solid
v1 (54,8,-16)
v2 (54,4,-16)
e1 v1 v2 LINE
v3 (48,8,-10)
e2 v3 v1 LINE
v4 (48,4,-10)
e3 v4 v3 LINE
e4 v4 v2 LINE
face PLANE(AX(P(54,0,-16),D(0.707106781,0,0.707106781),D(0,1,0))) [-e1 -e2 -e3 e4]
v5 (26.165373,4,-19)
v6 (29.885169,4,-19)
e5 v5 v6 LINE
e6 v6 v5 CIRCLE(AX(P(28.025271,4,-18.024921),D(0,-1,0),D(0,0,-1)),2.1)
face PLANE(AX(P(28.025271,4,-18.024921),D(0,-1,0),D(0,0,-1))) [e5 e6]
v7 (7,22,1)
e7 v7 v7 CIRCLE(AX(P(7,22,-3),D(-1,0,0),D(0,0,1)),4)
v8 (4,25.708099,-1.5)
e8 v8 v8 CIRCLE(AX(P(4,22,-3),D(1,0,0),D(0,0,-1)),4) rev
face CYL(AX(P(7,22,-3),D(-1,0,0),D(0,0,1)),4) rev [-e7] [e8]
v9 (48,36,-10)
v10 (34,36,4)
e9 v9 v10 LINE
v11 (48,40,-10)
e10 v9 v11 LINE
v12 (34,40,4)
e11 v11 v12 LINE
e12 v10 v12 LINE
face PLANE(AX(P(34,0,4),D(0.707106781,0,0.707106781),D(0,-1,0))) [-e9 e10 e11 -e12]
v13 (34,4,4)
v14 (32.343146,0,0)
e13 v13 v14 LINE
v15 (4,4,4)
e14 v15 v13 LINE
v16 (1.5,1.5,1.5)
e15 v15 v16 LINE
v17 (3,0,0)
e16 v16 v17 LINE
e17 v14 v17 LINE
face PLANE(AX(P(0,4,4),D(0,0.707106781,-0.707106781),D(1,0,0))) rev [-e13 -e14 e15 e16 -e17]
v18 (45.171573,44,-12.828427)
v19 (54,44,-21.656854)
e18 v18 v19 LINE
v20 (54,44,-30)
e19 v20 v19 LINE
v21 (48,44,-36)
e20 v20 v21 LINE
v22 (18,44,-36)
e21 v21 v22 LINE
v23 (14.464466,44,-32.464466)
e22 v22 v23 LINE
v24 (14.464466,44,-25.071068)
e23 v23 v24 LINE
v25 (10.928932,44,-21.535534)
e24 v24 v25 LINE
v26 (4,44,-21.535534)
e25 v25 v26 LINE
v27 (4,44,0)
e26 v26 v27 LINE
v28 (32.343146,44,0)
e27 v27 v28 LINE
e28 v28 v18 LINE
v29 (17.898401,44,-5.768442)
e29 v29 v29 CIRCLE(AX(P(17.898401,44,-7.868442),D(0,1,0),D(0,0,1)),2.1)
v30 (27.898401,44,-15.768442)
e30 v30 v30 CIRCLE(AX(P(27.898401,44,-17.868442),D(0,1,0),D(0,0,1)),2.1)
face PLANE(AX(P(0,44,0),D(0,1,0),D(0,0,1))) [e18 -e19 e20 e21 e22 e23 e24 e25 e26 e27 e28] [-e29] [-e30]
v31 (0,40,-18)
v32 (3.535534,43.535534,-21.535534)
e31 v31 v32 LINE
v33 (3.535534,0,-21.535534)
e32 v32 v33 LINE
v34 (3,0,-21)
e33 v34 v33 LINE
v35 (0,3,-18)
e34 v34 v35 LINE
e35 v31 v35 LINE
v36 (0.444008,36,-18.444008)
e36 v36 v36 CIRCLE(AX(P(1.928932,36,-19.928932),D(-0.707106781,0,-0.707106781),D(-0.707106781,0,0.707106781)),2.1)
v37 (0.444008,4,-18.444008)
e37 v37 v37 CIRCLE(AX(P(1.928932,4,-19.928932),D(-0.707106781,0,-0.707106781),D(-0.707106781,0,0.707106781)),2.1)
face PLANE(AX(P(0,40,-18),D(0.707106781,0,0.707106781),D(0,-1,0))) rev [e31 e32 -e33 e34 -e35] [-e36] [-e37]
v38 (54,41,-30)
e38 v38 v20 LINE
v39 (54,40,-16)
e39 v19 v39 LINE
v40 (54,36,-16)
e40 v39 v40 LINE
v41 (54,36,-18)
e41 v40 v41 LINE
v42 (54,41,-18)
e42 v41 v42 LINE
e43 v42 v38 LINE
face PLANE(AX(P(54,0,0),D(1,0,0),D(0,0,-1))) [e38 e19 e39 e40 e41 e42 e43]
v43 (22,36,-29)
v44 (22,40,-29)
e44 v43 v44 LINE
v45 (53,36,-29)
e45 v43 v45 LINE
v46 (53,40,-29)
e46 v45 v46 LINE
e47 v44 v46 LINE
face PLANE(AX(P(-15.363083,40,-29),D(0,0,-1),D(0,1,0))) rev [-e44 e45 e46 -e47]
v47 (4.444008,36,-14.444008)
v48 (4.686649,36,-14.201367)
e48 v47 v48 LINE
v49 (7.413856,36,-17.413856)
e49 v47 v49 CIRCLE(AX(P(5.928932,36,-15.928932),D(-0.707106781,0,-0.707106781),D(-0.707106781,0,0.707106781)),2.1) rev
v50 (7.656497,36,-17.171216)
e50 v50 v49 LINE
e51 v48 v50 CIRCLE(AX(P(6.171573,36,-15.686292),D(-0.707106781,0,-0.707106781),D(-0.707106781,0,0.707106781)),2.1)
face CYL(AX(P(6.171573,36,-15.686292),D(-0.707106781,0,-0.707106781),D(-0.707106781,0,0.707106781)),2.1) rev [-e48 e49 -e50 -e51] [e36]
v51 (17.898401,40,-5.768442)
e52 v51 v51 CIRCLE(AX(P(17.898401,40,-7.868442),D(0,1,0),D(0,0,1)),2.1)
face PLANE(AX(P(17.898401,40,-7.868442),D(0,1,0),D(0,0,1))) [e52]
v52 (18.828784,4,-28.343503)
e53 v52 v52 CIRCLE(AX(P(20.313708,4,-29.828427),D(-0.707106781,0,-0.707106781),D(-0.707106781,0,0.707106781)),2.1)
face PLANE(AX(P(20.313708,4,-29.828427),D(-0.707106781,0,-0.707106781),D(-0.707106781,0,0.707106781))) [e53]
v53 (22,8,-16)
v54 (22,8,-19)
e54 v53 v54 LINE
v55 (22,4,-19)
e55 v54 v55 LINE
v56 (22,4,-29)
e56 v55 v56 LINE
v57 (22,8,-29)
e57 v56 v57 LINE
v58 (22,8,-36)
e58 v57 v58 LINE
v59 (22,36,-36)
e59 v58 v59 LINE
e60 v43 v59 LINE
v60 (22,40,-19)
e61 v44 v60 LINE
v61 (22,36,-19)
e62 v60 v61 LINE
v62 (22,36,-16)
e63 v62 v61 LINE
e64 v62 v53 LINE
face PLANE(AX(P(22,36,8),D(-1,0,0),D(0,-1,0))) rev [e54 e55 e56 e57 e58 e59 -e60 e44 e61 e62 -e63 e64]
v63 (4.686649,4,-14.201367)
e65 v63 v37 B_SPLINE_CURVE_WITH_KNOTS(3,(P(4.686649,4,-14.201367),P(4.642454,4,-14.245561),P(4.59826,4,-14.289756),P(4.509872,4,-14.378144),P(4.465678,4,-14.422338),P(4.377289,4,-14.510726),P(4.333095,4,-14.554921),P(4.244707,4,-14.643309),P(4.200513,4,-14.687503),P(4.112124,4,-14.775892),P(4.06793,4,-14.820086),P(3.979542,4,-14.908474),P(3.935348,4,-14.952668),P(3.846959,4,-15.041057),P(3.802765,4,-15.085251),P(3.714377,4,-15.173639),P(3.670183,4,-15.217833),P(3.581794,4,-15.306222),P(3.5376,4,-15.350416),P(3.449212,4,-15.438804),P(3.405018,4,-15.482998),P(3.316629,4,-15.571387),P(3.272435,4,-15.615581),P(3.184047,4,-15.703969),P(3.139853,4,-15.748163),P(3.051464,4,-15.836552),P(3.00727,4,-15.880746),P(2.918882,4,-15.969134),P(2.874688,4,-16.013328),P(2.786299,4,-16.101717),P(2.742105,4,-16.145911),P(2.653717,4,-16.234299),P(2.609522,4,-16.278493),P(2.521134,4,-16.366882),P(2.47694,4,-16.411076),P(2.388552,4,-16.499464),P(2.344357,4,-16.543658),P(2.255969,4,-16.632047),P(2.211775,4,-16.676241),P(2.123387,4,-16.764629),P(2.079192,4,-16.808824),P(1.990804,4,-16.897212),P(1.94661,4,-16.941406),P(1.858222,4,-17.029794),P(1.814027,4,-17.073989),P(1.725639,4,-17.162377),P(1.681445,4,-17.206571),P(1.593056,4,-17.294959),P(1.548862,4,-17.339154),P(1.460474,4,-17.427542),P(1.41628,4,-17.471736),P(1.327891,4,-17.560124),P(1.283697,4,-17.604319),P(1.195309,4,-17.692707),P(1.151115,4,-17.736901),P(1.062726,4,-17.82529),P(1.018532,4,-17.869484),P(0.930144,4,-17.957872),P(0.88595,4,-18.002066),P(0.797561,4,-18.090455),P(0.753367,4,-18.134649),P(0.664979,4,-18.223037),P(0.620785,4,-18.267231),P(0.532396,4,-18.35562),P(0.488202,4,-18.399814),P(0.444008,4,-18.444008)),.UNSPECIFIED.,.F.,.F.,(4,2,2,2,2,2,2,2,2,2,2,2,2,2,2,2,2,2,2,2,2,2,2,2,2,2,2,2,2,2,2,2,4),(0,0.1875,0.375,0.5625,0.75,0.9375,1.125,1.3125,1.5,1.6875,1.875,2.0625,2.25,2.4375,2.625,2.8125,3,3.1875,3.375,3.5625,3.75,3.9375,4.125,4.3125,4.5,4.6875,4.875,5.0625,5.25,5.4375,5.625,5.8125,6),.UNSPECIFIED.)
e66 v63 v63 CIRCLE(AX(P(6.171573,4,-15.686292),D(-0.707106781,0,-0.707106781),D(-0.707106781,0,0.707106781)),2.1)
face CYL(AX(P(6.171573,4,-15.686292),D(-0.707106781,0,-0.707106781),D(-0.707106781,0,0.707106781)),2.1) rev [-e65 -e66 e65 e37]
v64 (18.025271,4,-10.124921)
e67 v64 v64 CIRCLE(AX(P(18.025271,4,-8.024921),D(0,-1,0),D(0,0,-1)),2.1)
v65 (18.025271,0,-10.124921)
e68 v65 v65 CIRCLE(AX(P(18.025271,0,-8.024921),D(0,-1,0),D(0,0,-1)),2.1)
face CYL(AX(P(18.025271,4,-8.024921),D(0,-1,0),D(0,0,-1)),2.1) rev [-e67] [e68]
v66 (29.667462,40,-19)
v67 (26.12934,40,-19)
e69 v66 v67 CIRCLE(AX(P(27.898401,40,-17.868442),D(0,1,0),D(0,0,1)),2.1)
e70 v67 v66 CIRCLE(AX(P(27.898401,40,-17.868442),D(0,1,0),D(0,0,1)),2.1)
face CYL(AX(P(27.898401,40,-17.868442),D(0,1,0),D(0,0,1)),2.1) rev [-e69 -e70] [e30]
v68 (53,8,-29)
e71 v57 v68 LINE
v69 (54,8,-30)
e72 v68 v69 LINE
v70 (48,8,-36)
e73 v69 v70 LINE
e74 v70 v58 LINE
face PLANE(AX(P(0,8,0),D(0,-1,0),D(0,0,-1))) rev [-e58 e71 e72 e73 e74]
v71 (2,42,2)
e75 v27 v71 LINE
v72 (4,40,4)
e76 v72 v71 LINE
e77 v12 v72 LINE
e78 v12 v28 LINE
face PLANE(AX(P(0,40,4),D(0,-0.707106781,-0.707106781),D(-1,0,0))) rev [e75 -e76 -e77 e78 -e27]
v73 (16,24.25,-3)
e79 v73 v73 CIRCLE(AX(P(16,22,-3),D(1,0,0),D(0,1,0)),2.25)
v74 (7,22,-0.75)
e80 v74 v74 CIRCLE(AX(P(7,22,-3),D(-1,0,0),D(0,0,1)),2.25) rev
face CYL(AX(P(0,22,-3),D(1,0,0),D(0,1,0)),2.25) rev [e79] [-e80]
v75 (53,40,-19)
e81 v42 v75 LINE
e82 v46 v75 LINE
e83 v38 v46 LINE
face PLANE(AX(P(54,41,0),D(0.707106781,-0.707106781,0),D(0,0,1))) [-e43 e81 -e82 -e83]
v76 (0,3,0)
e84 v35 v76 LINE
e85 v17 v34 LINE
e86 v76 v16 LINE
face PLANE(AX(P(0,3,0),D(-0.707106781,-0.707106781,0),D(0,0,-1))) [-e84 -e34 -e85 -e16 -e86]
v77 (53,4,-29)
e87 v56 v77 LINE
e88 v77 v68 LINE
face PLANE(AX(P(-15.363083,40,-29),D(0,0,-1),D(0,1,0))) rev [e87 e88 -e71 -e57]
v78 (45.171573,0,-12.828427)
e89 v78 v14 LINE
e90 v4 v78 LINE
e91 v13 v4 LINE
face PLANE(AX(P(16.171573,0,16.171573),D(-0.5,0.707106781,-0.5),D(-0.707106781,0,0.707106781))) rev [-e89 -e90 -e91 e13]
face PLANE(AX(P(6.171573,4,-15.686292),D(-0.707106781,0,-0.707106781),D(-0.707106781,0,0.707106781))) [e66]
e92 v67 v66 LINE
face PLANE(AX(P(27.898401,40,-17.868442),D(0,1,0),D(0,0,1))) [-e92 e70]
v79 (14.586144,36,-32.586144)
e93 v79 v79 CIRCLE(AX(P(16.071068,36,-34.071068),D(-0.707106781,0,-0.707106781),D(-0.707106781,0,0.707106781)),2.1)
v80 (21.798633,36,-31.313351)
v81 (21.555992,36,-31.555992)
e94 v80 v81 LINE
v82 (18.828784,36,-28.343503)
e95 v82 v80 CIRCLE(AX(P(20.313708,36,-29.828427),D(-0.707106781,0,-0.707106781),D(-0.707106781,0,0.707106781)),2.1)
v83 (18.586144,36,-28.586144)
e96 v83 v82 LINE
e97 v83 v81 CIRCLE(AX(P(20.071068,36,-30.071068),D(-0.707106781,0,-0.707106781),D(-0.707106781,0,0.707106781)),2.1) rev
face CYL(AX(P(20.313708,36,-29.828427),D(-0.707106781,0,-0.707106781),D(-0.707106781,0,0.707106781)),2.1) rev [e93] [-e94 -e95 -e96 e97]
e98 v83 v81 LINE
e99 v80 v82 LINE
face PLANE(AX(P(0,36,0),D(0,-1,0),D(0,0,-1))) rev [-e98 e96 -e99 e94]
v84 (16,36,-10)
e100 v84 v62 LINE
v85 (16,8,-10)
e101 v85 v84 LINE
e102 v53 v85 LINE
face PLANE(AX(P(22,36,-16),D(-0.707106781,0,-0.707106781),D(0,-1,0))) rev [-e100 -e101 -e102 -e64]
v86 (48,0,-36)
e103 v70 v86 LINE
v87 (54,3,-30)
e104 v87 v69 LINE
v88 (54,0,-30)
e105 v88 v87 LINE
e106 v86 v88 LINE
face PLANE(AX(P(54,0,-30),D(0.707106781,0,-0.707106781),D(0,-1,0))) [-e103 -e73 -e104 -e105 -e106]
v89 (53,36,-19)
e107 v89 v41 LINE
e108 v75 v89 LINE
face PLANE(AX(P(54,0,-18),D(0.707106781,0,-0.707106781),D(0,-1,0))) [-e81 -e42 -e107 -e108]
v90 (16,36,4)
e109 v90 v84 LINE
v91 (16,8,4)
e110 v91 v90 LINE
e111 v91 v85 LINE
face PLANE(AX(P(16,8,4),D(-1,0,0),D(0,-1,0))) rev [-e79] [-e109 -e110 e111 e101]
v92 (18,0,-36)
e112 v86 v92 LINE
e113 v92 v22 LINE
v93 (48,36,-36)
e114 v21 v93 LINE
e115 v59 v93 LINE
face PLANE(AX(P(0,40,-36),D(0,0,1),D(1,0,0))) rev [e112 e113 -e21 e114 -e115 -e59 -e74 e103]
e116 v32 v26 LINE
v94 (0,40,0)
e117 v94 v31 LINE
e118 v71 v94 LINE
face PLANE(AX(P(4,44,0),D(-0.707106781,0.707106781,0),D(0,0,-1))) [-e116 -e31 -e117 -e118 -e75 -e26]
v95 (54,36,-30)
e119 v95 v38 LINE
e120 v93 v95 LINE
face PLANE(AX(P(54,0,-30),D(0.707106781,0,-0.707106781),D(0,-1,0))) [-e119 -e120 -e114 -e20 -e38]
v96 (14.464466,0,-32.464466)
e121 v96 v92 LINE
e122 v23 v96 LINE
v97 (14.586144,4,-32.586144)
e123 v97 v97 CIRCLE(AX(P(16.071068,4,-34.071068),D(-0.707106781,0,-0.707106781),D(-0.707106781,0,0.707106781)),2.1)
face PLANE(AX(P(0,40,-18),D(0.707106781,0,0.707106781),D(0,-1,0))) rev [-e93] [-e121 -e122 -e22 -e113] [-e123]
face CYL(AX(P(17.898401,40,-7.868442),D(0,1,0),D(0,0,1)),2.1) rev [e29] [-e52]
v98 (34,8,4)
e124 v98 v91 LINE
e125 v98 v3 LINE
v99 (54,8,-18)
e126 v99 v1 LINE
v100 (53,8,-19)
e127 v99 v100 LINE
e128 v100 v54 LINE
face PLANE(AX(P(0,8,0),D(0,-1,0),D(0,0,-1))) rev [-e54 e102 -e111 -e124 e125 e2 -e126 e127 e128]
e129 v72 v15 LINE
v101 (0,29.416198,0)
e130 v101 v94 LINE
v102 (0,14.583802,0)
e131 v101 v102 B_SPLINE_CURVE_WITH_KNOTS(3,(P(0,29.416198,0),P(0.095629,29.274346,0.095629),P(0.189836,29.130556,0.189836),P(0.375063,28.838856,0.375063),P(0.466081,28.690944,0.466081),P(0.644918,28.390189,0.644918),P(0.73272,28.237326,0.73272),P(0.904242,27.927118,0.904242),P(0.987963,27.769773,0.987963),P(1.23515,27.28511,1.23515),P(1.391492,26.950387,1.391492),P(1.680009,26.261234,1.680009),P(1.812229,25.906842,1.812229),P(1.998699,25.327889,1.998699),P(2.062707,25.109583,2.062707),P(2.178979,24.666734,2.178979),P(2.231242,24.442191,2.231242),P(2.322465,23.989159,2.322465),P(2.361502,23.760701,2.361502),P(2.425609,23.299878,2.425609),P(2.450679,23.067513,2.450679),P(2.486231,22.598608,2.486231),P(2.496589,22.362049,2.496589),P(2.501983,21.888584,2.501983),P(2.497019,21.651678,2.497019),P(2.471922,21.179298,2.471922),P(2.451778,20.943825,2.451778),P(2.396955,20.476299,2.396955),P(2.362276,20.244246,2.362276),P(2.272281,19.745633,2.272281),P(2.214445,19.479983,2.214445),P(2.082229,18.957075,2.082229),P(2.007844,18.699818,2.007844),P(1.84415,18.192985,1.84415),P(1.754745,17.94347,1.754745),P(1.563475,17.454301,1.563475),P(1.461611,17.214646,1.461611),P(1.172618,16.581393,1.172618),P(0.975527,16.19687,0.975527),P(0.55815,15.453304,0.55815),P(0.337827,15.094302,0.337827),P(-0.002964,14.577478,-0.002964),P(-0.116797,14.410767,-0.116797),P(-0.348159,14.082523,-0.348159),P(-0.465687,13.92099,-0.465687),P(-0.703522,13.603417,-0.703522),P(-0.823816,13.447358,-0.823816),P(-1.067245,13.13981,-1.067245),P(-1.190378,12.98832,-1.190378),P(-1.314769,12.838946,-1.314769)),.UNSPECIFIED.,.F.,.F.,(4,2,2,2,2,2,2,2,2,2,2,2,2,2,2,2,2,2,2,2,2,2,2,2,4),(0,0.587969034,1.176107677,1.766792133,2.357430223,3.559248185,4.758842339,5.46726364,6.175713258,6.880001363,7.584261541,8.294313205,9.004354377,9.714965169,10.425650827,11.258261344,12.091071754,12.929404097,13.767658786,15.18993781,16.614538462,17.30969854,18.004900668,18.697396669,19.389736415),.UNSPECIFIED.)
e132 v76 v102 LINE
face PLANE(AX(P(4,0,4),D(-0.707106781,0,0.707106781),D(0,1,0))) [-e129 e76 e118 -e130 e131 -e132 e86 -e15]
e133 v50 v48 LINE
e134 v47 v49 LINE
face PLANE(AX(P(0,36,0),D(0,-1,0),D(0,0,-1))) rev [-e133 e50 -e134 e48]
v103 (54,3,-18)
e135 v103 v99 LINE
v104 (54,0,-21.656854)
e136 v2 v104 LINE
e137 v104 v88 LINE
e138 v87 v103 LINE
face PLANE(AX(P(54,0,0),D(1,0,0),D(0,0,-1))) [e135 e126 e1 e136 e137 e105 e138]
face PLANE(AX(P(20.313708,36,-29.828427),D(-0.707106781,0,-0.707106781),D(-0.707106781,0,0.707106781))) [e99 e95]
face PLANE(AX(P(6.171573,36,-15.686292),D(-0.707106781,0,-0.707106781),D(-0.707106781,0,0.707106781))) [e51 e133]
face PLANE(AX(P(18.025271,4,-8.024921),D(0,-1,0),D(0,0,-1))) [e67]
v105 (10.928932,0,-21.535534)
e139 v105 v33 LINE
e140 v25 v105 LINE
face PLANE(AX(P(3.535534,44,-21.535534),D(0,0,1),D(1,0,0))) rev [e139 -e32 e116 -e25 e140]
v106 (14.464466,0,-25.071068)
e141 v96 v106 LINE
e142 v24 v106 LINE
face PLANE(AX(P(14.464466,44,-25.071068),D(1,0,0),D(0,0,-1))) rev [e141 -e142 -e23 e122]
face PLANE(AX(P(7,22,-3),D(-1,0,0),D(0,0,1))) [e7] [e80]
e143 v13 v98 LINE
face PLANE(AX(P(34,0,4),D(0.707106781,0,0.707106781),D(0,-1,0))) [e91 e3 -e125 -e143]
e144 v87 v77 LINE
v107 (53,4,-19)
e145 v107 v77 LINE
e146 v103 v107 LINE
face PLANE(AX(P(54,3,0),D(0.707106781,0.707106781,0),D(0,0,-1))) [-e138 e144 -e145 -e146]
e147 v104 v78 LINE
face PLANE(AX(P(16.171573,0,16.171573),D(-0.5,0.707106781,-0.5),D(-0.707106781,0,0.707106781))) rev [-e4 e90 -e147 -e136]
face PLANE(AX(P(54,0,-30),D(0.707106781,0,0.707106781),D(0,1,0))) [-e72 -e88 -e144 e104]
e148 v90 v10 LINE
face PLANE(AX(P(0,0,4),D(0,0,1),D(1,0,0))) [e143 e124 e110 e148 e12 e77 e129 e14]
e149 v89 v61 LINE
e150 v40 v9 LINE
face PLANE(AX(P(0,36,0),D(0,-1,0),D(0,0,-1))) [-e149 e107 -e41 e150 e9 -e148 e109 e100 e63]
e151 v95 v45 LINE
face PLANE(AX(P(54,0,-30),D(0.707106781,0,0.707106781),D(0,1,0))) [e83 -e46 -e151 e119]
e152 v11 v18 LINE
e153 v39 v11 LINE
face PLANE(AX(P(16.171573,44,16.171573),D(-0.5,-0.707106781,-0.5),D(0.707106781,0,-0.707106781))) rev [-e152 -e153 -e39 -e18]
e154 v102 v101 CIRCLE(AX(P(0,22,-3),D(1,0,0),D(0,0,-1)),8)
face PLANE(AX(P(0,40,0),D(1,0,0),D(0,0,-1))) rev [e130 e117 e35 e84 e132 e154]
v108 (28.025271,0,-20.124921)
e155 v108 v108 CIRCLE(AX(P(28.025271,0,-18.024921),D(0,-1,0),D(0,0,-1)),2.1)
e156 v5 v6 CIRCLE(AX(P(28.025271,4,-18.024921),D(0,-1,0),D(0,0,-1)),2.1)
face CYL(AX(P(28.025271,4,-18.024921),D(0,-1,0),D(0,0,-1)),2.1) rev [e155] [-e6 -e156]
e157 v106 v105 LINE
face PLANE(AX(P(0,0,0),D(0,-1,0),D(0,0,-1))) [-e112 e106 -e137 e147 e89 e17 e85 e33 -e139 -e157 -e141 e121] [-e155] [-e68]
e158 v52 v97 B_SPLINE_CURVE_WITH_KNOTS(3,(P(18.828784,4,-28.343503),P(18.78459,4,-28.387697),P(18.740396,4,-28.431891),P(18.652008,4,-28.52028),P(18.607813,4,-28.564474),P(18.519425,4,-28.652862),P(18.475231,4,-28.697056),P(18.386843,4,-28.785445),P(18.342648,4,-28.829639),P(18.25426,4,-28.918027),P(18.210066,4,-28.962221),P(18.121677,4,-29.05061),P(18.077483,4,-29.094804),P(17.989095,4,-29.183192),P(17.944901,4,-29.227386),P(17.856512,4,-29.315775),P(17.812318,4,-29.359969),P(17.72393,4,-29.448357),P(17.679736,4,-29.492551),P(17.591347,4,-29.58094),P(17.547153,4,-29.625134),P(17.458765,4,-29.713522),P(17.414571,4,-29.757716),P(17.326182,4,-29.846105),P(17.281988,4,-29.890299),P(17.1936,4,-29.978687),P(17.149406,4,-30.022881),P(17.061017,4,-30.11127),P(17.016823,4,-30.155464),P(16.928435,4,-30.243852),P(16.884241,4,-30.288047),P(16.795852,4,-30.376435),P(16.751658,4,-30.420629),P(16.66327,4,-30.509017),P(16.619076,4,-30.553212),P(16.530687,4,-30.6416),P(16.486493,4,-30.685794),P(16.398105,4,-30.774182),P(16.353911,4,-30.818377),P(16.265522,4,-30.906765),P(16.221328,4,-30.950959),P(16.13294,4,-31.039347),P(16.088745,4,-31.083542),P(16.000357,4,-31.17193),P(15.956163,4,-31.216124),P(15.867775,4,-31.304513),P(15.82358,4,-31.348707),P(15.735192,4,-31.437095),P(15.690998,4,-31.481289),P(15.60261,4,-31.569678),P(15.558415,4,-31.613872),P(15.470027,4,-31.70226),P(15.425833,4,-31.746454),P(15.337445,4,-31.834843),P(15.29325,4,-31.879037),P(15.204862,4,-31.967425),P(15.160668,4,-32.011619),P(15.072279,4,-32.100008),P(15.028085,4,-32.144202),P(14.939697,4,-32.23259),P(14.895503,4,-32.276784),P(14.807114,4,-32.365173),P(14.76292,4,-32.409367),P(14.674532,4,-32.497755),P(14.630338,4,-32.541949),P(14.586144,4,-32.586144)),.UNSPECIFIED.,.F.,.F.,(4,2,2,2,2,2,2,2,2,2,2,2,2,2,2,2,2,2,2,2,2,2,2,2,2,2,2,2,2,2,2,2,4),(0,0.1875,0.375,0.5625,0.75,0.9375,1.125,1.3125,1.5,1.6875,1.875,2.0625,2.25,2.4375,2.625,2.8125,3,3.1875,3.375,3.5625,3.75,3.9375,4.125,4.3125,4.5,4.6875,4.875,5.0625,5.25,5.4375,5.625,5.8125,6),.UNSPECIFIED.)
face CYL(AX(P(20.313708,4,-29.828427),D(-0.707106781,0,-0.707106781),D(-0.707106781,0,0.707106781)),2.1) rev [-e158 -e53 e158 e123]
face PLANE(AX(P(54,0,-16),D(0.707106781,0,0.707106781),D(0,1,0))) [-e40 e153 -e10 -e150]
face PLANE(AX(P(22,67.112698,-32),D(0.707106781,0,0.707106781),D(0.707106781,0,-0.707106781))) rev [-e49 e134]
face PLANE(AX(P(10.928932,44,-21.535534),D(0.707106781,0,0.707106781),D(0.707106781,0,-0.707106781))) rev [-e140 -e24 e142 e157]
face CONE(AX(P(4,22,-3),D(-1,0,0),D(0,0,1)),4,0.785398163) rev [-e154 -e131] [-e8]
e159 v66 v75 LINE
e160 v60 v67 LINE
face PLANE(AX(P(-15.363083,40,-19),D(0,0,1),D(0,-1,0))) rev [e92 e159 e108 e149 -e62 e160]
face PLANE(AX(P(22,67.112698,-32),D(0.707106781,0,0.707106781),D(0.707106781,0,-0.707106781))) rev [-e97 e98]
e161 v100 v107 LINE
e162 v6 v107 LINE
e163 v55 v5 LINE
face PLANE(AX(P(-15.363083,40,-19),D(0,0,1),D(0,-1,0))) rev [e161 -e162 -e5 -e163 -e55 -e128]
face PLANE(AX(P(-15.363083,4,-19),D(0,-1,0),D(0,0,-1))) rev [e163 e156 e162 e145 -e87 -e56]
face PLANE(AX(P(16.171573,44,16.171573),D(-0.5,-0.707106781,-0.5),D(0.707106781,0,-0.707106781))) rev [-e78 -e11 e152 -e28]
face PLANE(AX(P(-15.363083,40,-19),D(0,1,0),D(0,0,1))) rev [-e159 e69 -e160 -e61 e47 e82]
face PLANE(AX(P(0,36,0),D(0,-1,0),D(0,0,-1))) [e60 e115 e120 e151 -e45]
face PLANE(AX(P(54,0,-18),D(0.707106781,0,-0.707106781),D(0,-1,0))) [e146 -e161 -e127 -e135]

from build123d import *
from build123d.topology import SkipClean

# Parameters (mm, degrees)
SKETCH9_W            = 36
SKETCH9_H            = 36
BOSS_EXTRUDE1_DEPTH  = 40
CHAMFER2_SIZE        = 18
SKETCH10_W           = 36
SKETCH10_H           = 40
BOSS_EXTRUDE2_DEPTH  = 8
SKETCH12_W           = 44
SKETCH12_H           = 40
BOSS_EXTRUDE3_DEPTH  = 8
CHAMFER3_SIZE        = 18
CHAMFER4_SIZE        = 6
SKETCH13_W           = 36.769552622
SKETCH13_H           = 20
CUT_EXTRUDE6_DEPTH   = 39.59798
SKETCH22_R           = 2.1
CUT_EXTRUDE13_DEPTH  = 6
BOSS_EXTRUDE7_DEPTH  = 8
BOSS_EXTRUDE8_DEPTH  = 12
BOSS_EXTRUDE9_DEPTH  = 4
CUT_EXTRUDE14_DEPTH  = 4
CUT_EXTRUDE15_DEPTH  = 4
SKETCH28_W           = 4
SKETCH28_H           = 28
CUT_EXTRUDE16_DEPTH  = 77.210235533
BOSS_EXTRUDE11_DEPTH = 28
SKETCH31_W           = 10
SKETCH31_H           = 36
CUT_EXTRUDE17_DEPTH  = 22
SKETCH32_W           = 44
SKETCH32_H           = 18.026894841
CUT_EXTRUDE18_DEPTH  = 72.888803022
BOSS_EXTRUDE12_DEPTH = 10
BOSS_EXTRUDE13_DEPTH = 10
CHAMFER5_SIZE        = 6
CUT_EXTRUDE19_DEPTH  = 79.409183136
CHAMFER6_SIZE        = 6
SKETCH37_R           = 2.8
CUT_EXTRUDE20_DEPTH  = 7
BOSS_EXTRUDE14_DEPTH = 14
CHAMFER7_SIZE        = 14
CHAMFER8_SIZE        = 4
BOSS_EXTRUDE15_START = 7
SKETCH41_R           = 2.8
BOSS_EXTRUDE15_DEPTH = 7
BOSS_EXTRUDE16_START = 7
SKETCH42_R           = 2.8
BOSS_EXTRUDE16_DEPTH = 7
CHAMFER9_SIZE        = 1
SKETCH43_R           = 2.25
CUT_EXTRUDE21_DEPTH  = 69.381283989
SKETCH44_R           = 4
CUT_EXTRUDE22_DEPTH  = 7
CHAMFER11_SIZE       = 4
CHAMFER12_SIZE       = 3
SKETCH48_R           = 2.1
CUT_EXTRUDE26_DEPTH  = 4
SKETCH49_R           = 2.1
CUT_EXTRUDE27_DEPTH  = 4
CUT_EXTRUDE28_DEPTH  = 79.409183136


with BuildPart() as part:
    # Sketch9 → Boss-Extrude1 (new body)
    with BuildSketch(Plane(origin=(0, 0, 0), x_dir=(1, 0, 0), z_dir=(0, 1, 0))):
        with Locations((18, 18)):
            Rectangle(SKETCH9_W, SKETCH9_H)
    extrude(amount=BOSS_EXTRUDE1_DEPTH)

    # Chamfer2
    chamfer2_edges = [part.edges().sort_by_distance(p)[0] for p in [
        (0, 20, -36),
    ]]
    chamfer(chamfer2_edges, length=CHAMFER2_SIZE)

    # Sketch10 → Boss-Extrude2 (add)
    with BuildSketch(Plane(origin=(36, 0, 0), x_dir=(0, 0, -1), z_dir=(1, 0, 0))):
        with Locations((18, 20)):
            Rectangle(SKETCH10_W, SKETCH10_H)
    extrude(amount=BOSS_EXTRUDE2_DEPTH)

    # Sketch12 → Boss-Extrude3 (add)
    with BuildSketch(Plane.XY):
        with Locations((22, 20)):
            Rectangle(SKETCH12_W, SKETCH12_H)
    extrude(amount=BOSS_EXTRUDE3_DEPTH)

    # Chamfer3
    chamfer3_edges = [part.edges().sort_by_distance(p)[0] for p in [
        (44, 20, -36),
        (0, 20, 8),
    ]]
    chamfer(chamfer3_edges, length=CHAMFER3_SIZE)

    # Chamfer4
    chamfer4_edges = [part.edges().sort_by_distance(p)[0] for p in [
        (44, 20, 8),
    ]]
    chamfer(chamfer4_edges, length=CHAMFER4_SIZE)

    # Sketch13 → Cut-Extrude6 (cut)
    with BuildSketch(Plane(origin=(23, 0, 23), x_dir=(0.7071067811865465, 0, -0.7071067811865487), z_dir=(0.7071067811865487, 0, 0.7071067811865465))):
        with Locations((25.455844123, 22)):
            Rectangle(SKETCH13_W, SKETCH13_H)
    extrude(amount=-CUT_EXTRUDE6_DEPTH, mode=Mode.SUBTRACT)

    # Sketch22 → Cut-Extrude13 (cut)
    with BuildSketch(Plane(origin=(-9, 0, -9), x_dir=(-0.7071067811865487, 0, 0.7071067811865465), z_dir=(-0.7071067811865465, 0, -0.7071067811865487))):
        with Locations((-15.455844123, 36)):
            Circle(SKETCH22_R)
        with Locations((-35.455844123, 36)):
            Circle(SKETCH22_R)
        with Locations((-35.455844123, 4)):
            Circle(SKETCH22_R)
        with Locations((-15.455844123, 4)):
            Circle(SKETCH22_R)
    extrude(amount=-CUT_EXTRUDE13_DEPTH, mode=Mode.SUBTRACT)

    # Sketch23 → Boss-Extrude7 (add)
    with BuildSketch(Plane(origin=(0, 40, 0), x_dir=(1, 0, 0), z_dir=(0, 1, 0))):
        Polygon((26, 36), (44, 36), (44, 18), align=None)
    extrude(amount=-BOSS_EXTRUDE7_DEPTH)

    # Sketch24 → Boss-Extrude8 (add)
    with BuildSketch(Plane(origin=(0, 0, 0), x_dir=(-1, 0, 0), z_dir=(0, -1, 0))):
        Polygon((-44, 18), (-26, 36), (-44, 36), align=None)
    extrude(amount=-BOSS_EXTRUDE8_DEPTH)

    # Sketch25 → Boss-Extrude9 (add)
    with BuildSketch(Plane(origin=(0, 40, 0), x_dir=(1, 0, 0), z_dir=(0, 1, 0))):
        Polygon((18, -8), (38, -8), (44, -2), (44, 36), (18, 36), (0, 18), (0, 10), align=None)
    extrude(amount=BOSS_EXTRUDE9_DEPTH)

    # Sketch26 → Cut-Extrude14 (cut)
    with SkipClean():  # the faces are left unmerged after this step: merging them gives an invalid solid
        with BuildSketch(Plane(origin=(0, 32, 0), x_dir=(-1, 0, 0), z_dir=(0, -1, 0))):
            Polygon((-44, 36), (-44, -2), (-38, -8), (-18, -8), (0, 10), (-26, 36), align=None)
        extrude(amount=-CUT_EXTRUDE14_DEPTH, mode=Mode.SUBTRACT)

    # Sketch27 → Cut-Extrude15 (cut)
    with BuildSketch(Plane(origin=(0, 12, 0), x_dir=(1, 0, 0), z_dir=(0, 1, 0))):
        Polygon((44, -2), (44, 36), (26, 36), (0, 10), (18, -8), (38, -8), align=None)
    extrude(amount=-CUT_EXTRUDE15_DEPTH, mode=Mode.SUBTRACT)

    # Sketch28 → Cut-Extrude16 (cut, through all)
    with BuildSketch(Plane(origin=(0, 0, -36), x_dir=(-1, 0, 0), z_dir=(0, 0, -1))):
        with Locations((-24, 22)):
            Rectangle(SKETCH28_W, SKETCH28_H)
    extrude(amount=-CUT_EXTRUDE16_DEPTH, mode=Mode.SUBTRACT)

    # Sketch30 → Boss-Extrude11 (add)
    with BuildSketch(Plane(origin=(0, 8, 0), x_dir=(1, 0, 0), z_dir=(0, 1, 0))):
        Polygon((0, 10), (22, 10), (22, 32), align=None)
    extrude(amount=BOSS_EXTRUDE11_DEPTH)

    # Sketch31 → Cut-Extrude17 (cut)
    with BuildSketch(Plane(origin=(44, 0, 0), x_dir=(0, 0, -1), z_dir=(1, 0, 0))):
        with Locations((24, 22)):
            Rectangle(SKETCH31_W, SKETCH31_H)
    extrude(amount=-CUT_EXTRUDE17_DEPTH, mode=Mode.SUBTRACT)

    # Sketch32 → Cut-Extrude18 (cut, through all)
    with BuildSketch(Plane(origin=(0, 0, 0), x_dir=(-1, 0, 0), z_dir=(0, -1, 0))):
        with Locations((-22, 0.986552579)):
            Rectangle(SKETCH32_W, SKETCH32_H)
    extrude(amount=-CUT_EXTRUDE18_DEPTH, mode=Mode.SUBTRACT)

    # Sketch33 → Boss-Extrude12 (add)
    with BuildSketch(Plane(origin=(44, 0, 0), x_dir=(0, 0, -1), z_dir=(1, 0, 0))):
        Polygon((10, 8), (10, 0), (36, 0), (36, 8), (29, 8), (29, 4), (19, 4), (19, 8), align=None)
    extrude(amount=BOSS_EXTRUDE12_DEPTH)

    # Sketch35 → Boss-Extrude13 (add)
    with BuildSketch(Plane(origin=(44, 0, 0), x_dir=(0, 0, -1), z_dir=(1, 0, 0))):
        Polygon((10, 44), (10, 36), (19, 36), (19, 40), (29, 40), (29, 36), (36, 36), (36, 44), align=None)
    extrude(amount=BOSS_EXTRUDE13_DEPTH)

    # Chamfer5
    chamfer5_edges = [part.edges().sort_by_distance(p)[0] for p in [
        (54, 4, -10),
        (54, 4, -36),
        (54, 40, -10),
        (54, 40, -36),
    ]]
    chamfer(chamfer5_edges, length=CHAMFER5_SIZE)

    # Sketch36 → Cut-Extrude19 (cut, through all)
    with BuildSketch(Plane(origin=(0, 44, 0), x_dir=(1, 0, 0), z_dir=(0, 1, 0))):
        Polygon((14, 32), (14, 26), (10, 22), (4, 22), align=None)
    extrude(amount=-CUT_EXTRUDE19_DEPTH, mode=Mode.SUBTRACT)

    # Chamfer6
    chamfer6_edges = [part.edges().sort_by_distance(p)[0] for p in [
        (22, 22, -10),
    ]]
    chamfer(chamfer6_edges, length=CHAMFER6_SIZE)

    # Sketch37 → Cut-Extrude20 (cut)
    with BuildSketch(Plane(origin=(22, 0, 0), x_dir=(0, 0, -1), z_dir=(1, 0, 0))):
        with Locations(Location((24, 31, 0), (0, 0, 90))):
            Circle(SKETCH37_R)
        with Locations(Location((24, 13, 0), (0, 0, 90))):
            Circle(SKETCH37_R)
    extrude(amount=-CUT_EXTRUDE20_DEPTH, mode=Mode.SUBTRACT)

    # Sketch39 → Boss-Extrude14 (add)
    with BuildSketch(Plane.XY.offset(-10)):
        Polygon((48, 8), (16, 8), (16, 36), (48, 36), (48, 44), (0, 44), (0, 0), (48, 0), align=None)
    extrude(amount=BOSS_EXTRUDE14_DEPTH)

    # Chamfer7
    chamfer7_edges = [part.edges().sort_by_distance(p)[0] for p in [
        (48, 4, 4),
        (48, 40, 4),
    ]]
    chamfer(chamfer7_edges, length=CHAMFER7_SIZE - 0.0001)  # a hair under: the kernel refuses the full size

    # Chamfer8
    chamfer8_edges = [part.edges().sort_by_distance(p)[0] for p in [
        (17.00005, 0, 4),
        (0, 22, 4),
        (17.00005, 44, 4),
        (41.00005, 0, -2.99995),
        (48, 0, -9.99995),
        (51, 0, -13),
        (41.00005, 44, -2.99995),
        (48, 44, -9.99995),
        (51, 44, -13),
    ]]
    chamfer(chamfer8_edges, length=CHAMFER8_SIZE)

    # Sketch41 → Boss-Extrude15 (add)
    with BuildSketch(Plane(origin=(15, 0, 0), x_dir=(0, 0, -1), z_dir=(1, 0, 0)).offset(BOSS_EXTRUDE15_START)):
        with Locations((24, 31)):
            Circle(SKETCH41_R)
    extrude(amount=-BOSS_EXTRUDE15_DEPTH)

    # Sketch42 → Boss-Extrude16 (add)
    with BuildSketch(Plane(origin=(15, 0, 0), x_dir=(0, 0, -1), z_dir=(1, 0, 0)).offset(BOSS_EXTRUDE16_START)):
        with Locations((24, 13)):
            Circle(SKETCH42_R)
    extrude(amount=-BOSS_EXTRUDE16_DEPTH)

    # Chamfer9
    chamfer9_edges = [part.edges().sort_by_distance(p)[0] for p in [
        (54, 6, -29),
        (54, 4, -24),
        (54, 6, -19),
        (54, 38, -19),
        (54, 40, -24),
        (54, 38, -29),
    ]]
    chamfer(chamfer9_edges, length=CHAMFER9_SIZE - 0.0001)  # a hair under: the kernel refuses the full size

    # Sketch43 → Cut-Extrude21 (cut, through all)
    with BuildSketch(Plane(origin=(16, 0, 0), x_dir=(0, 0, -1), z_dir=(1, 0, 0))):
        with Locations(Location((3, 22, 0), (0, 0, 90))):
            Circle(SKETCH43_R)
    extrude(amount=-CUT_EXTRUDE21_DEPTH, mode=Mode.SUBTRACT)

    # Sketch44 → Cut-Extrude22 (cut)
    with BuildSketch(Plane.ZY):
        with Locations((-3, 22)):
            Circle(SKETCH44_R)
    extrude(amount=-CUT_EXTRUDE22_DEPTH, mode=Mode.SUBTRACT)

    # Chamfer10: read off the stored shape, not the designer's step
    # Chamfer10 outline → Chamfer10 (revolve, cut)
    with BuildSketch(Plane(origin=(0, 22, -3), x_dir=(0, 1, 0), z_dir=(0, 0, -1))):
        Polygon((8, 0), (4, 4), (4, 0), align=None)
    revolve(axis=Axis((0, 22, -3), (1, 0, 0)), mode=Mode.SUBTRACT)

    # Chamfer11
    chamfer11_edges = [part.edges().sort_by_distance(p)[0] for p in [
        (0, 44, -9),
    ]]
    chamfer(chamfer11_edges, length=CHAMFER11_SIZE)

    # Chamfer12
    chamfer12_edges = [part.edges().sort_by_distance(p)[0] for p in [
        (0, 0, -9),
    ]]
    chamfer(chamfer12_edges, length=CHAMFER12_SIZE)

    # Sketch48 → Cut-Extrude26 (cut)
    with BuildSketch(Plane(origin=(0, 0, 0), x_dir=(-1, 0, 0), z_dir=(0, -1, 0))):
        with Locations(Location((-28.025270862, 18.024920623, 0), (0, 0, 90))):
            Circle(SKETCH48_R)
        with Locations(Location((-18.025270862, 8.024920623, 0), (0, 0, 90))):
            Circle(SKETCH48_R)
    extrude(amount=-CUT_EXTRUDE26_DEPTH, mode=Mode.SUBTRACT)

    # Sketch49 → Cut-Extrude27 (cut)
    with BuildSketch(Plane(origin=(0, 44, 0), x_dir=(1, 0, 0), z_dir=(0, 1, 0))):
        with Locations(Location((17.898400733, 7.868441876, 0), (0, 0, 270))):
            Circle(SKETCH49_R)
        with Locations(Location((27.898400733, 17.868441876, 0), (0, 0, 270))):
            Circle(SKETCH49_R)
    extrude(amount=-CUT_EXTRUDE27_DEPTH, mode=Mode.SUBTRACT)

    # Sketch50 → Cut-Extrude28 (cut, through all)
    with BuildSketch(Plane(origin=(0, 0, 0), x_dir=(-1, 0, 0), z_dir=(0, -1, 0))):
        Polygon((-3.535533906, 21.535533906), (-10.928932188, 21.535533906), (-14.464466094, 25.071067812), (-14.464466094, 32.464466094), align=None)
    extrude(amount=-CUT_EXTRUDE28_DEPTH, mode=Mode.SUBTRACT)


solid = part.part
